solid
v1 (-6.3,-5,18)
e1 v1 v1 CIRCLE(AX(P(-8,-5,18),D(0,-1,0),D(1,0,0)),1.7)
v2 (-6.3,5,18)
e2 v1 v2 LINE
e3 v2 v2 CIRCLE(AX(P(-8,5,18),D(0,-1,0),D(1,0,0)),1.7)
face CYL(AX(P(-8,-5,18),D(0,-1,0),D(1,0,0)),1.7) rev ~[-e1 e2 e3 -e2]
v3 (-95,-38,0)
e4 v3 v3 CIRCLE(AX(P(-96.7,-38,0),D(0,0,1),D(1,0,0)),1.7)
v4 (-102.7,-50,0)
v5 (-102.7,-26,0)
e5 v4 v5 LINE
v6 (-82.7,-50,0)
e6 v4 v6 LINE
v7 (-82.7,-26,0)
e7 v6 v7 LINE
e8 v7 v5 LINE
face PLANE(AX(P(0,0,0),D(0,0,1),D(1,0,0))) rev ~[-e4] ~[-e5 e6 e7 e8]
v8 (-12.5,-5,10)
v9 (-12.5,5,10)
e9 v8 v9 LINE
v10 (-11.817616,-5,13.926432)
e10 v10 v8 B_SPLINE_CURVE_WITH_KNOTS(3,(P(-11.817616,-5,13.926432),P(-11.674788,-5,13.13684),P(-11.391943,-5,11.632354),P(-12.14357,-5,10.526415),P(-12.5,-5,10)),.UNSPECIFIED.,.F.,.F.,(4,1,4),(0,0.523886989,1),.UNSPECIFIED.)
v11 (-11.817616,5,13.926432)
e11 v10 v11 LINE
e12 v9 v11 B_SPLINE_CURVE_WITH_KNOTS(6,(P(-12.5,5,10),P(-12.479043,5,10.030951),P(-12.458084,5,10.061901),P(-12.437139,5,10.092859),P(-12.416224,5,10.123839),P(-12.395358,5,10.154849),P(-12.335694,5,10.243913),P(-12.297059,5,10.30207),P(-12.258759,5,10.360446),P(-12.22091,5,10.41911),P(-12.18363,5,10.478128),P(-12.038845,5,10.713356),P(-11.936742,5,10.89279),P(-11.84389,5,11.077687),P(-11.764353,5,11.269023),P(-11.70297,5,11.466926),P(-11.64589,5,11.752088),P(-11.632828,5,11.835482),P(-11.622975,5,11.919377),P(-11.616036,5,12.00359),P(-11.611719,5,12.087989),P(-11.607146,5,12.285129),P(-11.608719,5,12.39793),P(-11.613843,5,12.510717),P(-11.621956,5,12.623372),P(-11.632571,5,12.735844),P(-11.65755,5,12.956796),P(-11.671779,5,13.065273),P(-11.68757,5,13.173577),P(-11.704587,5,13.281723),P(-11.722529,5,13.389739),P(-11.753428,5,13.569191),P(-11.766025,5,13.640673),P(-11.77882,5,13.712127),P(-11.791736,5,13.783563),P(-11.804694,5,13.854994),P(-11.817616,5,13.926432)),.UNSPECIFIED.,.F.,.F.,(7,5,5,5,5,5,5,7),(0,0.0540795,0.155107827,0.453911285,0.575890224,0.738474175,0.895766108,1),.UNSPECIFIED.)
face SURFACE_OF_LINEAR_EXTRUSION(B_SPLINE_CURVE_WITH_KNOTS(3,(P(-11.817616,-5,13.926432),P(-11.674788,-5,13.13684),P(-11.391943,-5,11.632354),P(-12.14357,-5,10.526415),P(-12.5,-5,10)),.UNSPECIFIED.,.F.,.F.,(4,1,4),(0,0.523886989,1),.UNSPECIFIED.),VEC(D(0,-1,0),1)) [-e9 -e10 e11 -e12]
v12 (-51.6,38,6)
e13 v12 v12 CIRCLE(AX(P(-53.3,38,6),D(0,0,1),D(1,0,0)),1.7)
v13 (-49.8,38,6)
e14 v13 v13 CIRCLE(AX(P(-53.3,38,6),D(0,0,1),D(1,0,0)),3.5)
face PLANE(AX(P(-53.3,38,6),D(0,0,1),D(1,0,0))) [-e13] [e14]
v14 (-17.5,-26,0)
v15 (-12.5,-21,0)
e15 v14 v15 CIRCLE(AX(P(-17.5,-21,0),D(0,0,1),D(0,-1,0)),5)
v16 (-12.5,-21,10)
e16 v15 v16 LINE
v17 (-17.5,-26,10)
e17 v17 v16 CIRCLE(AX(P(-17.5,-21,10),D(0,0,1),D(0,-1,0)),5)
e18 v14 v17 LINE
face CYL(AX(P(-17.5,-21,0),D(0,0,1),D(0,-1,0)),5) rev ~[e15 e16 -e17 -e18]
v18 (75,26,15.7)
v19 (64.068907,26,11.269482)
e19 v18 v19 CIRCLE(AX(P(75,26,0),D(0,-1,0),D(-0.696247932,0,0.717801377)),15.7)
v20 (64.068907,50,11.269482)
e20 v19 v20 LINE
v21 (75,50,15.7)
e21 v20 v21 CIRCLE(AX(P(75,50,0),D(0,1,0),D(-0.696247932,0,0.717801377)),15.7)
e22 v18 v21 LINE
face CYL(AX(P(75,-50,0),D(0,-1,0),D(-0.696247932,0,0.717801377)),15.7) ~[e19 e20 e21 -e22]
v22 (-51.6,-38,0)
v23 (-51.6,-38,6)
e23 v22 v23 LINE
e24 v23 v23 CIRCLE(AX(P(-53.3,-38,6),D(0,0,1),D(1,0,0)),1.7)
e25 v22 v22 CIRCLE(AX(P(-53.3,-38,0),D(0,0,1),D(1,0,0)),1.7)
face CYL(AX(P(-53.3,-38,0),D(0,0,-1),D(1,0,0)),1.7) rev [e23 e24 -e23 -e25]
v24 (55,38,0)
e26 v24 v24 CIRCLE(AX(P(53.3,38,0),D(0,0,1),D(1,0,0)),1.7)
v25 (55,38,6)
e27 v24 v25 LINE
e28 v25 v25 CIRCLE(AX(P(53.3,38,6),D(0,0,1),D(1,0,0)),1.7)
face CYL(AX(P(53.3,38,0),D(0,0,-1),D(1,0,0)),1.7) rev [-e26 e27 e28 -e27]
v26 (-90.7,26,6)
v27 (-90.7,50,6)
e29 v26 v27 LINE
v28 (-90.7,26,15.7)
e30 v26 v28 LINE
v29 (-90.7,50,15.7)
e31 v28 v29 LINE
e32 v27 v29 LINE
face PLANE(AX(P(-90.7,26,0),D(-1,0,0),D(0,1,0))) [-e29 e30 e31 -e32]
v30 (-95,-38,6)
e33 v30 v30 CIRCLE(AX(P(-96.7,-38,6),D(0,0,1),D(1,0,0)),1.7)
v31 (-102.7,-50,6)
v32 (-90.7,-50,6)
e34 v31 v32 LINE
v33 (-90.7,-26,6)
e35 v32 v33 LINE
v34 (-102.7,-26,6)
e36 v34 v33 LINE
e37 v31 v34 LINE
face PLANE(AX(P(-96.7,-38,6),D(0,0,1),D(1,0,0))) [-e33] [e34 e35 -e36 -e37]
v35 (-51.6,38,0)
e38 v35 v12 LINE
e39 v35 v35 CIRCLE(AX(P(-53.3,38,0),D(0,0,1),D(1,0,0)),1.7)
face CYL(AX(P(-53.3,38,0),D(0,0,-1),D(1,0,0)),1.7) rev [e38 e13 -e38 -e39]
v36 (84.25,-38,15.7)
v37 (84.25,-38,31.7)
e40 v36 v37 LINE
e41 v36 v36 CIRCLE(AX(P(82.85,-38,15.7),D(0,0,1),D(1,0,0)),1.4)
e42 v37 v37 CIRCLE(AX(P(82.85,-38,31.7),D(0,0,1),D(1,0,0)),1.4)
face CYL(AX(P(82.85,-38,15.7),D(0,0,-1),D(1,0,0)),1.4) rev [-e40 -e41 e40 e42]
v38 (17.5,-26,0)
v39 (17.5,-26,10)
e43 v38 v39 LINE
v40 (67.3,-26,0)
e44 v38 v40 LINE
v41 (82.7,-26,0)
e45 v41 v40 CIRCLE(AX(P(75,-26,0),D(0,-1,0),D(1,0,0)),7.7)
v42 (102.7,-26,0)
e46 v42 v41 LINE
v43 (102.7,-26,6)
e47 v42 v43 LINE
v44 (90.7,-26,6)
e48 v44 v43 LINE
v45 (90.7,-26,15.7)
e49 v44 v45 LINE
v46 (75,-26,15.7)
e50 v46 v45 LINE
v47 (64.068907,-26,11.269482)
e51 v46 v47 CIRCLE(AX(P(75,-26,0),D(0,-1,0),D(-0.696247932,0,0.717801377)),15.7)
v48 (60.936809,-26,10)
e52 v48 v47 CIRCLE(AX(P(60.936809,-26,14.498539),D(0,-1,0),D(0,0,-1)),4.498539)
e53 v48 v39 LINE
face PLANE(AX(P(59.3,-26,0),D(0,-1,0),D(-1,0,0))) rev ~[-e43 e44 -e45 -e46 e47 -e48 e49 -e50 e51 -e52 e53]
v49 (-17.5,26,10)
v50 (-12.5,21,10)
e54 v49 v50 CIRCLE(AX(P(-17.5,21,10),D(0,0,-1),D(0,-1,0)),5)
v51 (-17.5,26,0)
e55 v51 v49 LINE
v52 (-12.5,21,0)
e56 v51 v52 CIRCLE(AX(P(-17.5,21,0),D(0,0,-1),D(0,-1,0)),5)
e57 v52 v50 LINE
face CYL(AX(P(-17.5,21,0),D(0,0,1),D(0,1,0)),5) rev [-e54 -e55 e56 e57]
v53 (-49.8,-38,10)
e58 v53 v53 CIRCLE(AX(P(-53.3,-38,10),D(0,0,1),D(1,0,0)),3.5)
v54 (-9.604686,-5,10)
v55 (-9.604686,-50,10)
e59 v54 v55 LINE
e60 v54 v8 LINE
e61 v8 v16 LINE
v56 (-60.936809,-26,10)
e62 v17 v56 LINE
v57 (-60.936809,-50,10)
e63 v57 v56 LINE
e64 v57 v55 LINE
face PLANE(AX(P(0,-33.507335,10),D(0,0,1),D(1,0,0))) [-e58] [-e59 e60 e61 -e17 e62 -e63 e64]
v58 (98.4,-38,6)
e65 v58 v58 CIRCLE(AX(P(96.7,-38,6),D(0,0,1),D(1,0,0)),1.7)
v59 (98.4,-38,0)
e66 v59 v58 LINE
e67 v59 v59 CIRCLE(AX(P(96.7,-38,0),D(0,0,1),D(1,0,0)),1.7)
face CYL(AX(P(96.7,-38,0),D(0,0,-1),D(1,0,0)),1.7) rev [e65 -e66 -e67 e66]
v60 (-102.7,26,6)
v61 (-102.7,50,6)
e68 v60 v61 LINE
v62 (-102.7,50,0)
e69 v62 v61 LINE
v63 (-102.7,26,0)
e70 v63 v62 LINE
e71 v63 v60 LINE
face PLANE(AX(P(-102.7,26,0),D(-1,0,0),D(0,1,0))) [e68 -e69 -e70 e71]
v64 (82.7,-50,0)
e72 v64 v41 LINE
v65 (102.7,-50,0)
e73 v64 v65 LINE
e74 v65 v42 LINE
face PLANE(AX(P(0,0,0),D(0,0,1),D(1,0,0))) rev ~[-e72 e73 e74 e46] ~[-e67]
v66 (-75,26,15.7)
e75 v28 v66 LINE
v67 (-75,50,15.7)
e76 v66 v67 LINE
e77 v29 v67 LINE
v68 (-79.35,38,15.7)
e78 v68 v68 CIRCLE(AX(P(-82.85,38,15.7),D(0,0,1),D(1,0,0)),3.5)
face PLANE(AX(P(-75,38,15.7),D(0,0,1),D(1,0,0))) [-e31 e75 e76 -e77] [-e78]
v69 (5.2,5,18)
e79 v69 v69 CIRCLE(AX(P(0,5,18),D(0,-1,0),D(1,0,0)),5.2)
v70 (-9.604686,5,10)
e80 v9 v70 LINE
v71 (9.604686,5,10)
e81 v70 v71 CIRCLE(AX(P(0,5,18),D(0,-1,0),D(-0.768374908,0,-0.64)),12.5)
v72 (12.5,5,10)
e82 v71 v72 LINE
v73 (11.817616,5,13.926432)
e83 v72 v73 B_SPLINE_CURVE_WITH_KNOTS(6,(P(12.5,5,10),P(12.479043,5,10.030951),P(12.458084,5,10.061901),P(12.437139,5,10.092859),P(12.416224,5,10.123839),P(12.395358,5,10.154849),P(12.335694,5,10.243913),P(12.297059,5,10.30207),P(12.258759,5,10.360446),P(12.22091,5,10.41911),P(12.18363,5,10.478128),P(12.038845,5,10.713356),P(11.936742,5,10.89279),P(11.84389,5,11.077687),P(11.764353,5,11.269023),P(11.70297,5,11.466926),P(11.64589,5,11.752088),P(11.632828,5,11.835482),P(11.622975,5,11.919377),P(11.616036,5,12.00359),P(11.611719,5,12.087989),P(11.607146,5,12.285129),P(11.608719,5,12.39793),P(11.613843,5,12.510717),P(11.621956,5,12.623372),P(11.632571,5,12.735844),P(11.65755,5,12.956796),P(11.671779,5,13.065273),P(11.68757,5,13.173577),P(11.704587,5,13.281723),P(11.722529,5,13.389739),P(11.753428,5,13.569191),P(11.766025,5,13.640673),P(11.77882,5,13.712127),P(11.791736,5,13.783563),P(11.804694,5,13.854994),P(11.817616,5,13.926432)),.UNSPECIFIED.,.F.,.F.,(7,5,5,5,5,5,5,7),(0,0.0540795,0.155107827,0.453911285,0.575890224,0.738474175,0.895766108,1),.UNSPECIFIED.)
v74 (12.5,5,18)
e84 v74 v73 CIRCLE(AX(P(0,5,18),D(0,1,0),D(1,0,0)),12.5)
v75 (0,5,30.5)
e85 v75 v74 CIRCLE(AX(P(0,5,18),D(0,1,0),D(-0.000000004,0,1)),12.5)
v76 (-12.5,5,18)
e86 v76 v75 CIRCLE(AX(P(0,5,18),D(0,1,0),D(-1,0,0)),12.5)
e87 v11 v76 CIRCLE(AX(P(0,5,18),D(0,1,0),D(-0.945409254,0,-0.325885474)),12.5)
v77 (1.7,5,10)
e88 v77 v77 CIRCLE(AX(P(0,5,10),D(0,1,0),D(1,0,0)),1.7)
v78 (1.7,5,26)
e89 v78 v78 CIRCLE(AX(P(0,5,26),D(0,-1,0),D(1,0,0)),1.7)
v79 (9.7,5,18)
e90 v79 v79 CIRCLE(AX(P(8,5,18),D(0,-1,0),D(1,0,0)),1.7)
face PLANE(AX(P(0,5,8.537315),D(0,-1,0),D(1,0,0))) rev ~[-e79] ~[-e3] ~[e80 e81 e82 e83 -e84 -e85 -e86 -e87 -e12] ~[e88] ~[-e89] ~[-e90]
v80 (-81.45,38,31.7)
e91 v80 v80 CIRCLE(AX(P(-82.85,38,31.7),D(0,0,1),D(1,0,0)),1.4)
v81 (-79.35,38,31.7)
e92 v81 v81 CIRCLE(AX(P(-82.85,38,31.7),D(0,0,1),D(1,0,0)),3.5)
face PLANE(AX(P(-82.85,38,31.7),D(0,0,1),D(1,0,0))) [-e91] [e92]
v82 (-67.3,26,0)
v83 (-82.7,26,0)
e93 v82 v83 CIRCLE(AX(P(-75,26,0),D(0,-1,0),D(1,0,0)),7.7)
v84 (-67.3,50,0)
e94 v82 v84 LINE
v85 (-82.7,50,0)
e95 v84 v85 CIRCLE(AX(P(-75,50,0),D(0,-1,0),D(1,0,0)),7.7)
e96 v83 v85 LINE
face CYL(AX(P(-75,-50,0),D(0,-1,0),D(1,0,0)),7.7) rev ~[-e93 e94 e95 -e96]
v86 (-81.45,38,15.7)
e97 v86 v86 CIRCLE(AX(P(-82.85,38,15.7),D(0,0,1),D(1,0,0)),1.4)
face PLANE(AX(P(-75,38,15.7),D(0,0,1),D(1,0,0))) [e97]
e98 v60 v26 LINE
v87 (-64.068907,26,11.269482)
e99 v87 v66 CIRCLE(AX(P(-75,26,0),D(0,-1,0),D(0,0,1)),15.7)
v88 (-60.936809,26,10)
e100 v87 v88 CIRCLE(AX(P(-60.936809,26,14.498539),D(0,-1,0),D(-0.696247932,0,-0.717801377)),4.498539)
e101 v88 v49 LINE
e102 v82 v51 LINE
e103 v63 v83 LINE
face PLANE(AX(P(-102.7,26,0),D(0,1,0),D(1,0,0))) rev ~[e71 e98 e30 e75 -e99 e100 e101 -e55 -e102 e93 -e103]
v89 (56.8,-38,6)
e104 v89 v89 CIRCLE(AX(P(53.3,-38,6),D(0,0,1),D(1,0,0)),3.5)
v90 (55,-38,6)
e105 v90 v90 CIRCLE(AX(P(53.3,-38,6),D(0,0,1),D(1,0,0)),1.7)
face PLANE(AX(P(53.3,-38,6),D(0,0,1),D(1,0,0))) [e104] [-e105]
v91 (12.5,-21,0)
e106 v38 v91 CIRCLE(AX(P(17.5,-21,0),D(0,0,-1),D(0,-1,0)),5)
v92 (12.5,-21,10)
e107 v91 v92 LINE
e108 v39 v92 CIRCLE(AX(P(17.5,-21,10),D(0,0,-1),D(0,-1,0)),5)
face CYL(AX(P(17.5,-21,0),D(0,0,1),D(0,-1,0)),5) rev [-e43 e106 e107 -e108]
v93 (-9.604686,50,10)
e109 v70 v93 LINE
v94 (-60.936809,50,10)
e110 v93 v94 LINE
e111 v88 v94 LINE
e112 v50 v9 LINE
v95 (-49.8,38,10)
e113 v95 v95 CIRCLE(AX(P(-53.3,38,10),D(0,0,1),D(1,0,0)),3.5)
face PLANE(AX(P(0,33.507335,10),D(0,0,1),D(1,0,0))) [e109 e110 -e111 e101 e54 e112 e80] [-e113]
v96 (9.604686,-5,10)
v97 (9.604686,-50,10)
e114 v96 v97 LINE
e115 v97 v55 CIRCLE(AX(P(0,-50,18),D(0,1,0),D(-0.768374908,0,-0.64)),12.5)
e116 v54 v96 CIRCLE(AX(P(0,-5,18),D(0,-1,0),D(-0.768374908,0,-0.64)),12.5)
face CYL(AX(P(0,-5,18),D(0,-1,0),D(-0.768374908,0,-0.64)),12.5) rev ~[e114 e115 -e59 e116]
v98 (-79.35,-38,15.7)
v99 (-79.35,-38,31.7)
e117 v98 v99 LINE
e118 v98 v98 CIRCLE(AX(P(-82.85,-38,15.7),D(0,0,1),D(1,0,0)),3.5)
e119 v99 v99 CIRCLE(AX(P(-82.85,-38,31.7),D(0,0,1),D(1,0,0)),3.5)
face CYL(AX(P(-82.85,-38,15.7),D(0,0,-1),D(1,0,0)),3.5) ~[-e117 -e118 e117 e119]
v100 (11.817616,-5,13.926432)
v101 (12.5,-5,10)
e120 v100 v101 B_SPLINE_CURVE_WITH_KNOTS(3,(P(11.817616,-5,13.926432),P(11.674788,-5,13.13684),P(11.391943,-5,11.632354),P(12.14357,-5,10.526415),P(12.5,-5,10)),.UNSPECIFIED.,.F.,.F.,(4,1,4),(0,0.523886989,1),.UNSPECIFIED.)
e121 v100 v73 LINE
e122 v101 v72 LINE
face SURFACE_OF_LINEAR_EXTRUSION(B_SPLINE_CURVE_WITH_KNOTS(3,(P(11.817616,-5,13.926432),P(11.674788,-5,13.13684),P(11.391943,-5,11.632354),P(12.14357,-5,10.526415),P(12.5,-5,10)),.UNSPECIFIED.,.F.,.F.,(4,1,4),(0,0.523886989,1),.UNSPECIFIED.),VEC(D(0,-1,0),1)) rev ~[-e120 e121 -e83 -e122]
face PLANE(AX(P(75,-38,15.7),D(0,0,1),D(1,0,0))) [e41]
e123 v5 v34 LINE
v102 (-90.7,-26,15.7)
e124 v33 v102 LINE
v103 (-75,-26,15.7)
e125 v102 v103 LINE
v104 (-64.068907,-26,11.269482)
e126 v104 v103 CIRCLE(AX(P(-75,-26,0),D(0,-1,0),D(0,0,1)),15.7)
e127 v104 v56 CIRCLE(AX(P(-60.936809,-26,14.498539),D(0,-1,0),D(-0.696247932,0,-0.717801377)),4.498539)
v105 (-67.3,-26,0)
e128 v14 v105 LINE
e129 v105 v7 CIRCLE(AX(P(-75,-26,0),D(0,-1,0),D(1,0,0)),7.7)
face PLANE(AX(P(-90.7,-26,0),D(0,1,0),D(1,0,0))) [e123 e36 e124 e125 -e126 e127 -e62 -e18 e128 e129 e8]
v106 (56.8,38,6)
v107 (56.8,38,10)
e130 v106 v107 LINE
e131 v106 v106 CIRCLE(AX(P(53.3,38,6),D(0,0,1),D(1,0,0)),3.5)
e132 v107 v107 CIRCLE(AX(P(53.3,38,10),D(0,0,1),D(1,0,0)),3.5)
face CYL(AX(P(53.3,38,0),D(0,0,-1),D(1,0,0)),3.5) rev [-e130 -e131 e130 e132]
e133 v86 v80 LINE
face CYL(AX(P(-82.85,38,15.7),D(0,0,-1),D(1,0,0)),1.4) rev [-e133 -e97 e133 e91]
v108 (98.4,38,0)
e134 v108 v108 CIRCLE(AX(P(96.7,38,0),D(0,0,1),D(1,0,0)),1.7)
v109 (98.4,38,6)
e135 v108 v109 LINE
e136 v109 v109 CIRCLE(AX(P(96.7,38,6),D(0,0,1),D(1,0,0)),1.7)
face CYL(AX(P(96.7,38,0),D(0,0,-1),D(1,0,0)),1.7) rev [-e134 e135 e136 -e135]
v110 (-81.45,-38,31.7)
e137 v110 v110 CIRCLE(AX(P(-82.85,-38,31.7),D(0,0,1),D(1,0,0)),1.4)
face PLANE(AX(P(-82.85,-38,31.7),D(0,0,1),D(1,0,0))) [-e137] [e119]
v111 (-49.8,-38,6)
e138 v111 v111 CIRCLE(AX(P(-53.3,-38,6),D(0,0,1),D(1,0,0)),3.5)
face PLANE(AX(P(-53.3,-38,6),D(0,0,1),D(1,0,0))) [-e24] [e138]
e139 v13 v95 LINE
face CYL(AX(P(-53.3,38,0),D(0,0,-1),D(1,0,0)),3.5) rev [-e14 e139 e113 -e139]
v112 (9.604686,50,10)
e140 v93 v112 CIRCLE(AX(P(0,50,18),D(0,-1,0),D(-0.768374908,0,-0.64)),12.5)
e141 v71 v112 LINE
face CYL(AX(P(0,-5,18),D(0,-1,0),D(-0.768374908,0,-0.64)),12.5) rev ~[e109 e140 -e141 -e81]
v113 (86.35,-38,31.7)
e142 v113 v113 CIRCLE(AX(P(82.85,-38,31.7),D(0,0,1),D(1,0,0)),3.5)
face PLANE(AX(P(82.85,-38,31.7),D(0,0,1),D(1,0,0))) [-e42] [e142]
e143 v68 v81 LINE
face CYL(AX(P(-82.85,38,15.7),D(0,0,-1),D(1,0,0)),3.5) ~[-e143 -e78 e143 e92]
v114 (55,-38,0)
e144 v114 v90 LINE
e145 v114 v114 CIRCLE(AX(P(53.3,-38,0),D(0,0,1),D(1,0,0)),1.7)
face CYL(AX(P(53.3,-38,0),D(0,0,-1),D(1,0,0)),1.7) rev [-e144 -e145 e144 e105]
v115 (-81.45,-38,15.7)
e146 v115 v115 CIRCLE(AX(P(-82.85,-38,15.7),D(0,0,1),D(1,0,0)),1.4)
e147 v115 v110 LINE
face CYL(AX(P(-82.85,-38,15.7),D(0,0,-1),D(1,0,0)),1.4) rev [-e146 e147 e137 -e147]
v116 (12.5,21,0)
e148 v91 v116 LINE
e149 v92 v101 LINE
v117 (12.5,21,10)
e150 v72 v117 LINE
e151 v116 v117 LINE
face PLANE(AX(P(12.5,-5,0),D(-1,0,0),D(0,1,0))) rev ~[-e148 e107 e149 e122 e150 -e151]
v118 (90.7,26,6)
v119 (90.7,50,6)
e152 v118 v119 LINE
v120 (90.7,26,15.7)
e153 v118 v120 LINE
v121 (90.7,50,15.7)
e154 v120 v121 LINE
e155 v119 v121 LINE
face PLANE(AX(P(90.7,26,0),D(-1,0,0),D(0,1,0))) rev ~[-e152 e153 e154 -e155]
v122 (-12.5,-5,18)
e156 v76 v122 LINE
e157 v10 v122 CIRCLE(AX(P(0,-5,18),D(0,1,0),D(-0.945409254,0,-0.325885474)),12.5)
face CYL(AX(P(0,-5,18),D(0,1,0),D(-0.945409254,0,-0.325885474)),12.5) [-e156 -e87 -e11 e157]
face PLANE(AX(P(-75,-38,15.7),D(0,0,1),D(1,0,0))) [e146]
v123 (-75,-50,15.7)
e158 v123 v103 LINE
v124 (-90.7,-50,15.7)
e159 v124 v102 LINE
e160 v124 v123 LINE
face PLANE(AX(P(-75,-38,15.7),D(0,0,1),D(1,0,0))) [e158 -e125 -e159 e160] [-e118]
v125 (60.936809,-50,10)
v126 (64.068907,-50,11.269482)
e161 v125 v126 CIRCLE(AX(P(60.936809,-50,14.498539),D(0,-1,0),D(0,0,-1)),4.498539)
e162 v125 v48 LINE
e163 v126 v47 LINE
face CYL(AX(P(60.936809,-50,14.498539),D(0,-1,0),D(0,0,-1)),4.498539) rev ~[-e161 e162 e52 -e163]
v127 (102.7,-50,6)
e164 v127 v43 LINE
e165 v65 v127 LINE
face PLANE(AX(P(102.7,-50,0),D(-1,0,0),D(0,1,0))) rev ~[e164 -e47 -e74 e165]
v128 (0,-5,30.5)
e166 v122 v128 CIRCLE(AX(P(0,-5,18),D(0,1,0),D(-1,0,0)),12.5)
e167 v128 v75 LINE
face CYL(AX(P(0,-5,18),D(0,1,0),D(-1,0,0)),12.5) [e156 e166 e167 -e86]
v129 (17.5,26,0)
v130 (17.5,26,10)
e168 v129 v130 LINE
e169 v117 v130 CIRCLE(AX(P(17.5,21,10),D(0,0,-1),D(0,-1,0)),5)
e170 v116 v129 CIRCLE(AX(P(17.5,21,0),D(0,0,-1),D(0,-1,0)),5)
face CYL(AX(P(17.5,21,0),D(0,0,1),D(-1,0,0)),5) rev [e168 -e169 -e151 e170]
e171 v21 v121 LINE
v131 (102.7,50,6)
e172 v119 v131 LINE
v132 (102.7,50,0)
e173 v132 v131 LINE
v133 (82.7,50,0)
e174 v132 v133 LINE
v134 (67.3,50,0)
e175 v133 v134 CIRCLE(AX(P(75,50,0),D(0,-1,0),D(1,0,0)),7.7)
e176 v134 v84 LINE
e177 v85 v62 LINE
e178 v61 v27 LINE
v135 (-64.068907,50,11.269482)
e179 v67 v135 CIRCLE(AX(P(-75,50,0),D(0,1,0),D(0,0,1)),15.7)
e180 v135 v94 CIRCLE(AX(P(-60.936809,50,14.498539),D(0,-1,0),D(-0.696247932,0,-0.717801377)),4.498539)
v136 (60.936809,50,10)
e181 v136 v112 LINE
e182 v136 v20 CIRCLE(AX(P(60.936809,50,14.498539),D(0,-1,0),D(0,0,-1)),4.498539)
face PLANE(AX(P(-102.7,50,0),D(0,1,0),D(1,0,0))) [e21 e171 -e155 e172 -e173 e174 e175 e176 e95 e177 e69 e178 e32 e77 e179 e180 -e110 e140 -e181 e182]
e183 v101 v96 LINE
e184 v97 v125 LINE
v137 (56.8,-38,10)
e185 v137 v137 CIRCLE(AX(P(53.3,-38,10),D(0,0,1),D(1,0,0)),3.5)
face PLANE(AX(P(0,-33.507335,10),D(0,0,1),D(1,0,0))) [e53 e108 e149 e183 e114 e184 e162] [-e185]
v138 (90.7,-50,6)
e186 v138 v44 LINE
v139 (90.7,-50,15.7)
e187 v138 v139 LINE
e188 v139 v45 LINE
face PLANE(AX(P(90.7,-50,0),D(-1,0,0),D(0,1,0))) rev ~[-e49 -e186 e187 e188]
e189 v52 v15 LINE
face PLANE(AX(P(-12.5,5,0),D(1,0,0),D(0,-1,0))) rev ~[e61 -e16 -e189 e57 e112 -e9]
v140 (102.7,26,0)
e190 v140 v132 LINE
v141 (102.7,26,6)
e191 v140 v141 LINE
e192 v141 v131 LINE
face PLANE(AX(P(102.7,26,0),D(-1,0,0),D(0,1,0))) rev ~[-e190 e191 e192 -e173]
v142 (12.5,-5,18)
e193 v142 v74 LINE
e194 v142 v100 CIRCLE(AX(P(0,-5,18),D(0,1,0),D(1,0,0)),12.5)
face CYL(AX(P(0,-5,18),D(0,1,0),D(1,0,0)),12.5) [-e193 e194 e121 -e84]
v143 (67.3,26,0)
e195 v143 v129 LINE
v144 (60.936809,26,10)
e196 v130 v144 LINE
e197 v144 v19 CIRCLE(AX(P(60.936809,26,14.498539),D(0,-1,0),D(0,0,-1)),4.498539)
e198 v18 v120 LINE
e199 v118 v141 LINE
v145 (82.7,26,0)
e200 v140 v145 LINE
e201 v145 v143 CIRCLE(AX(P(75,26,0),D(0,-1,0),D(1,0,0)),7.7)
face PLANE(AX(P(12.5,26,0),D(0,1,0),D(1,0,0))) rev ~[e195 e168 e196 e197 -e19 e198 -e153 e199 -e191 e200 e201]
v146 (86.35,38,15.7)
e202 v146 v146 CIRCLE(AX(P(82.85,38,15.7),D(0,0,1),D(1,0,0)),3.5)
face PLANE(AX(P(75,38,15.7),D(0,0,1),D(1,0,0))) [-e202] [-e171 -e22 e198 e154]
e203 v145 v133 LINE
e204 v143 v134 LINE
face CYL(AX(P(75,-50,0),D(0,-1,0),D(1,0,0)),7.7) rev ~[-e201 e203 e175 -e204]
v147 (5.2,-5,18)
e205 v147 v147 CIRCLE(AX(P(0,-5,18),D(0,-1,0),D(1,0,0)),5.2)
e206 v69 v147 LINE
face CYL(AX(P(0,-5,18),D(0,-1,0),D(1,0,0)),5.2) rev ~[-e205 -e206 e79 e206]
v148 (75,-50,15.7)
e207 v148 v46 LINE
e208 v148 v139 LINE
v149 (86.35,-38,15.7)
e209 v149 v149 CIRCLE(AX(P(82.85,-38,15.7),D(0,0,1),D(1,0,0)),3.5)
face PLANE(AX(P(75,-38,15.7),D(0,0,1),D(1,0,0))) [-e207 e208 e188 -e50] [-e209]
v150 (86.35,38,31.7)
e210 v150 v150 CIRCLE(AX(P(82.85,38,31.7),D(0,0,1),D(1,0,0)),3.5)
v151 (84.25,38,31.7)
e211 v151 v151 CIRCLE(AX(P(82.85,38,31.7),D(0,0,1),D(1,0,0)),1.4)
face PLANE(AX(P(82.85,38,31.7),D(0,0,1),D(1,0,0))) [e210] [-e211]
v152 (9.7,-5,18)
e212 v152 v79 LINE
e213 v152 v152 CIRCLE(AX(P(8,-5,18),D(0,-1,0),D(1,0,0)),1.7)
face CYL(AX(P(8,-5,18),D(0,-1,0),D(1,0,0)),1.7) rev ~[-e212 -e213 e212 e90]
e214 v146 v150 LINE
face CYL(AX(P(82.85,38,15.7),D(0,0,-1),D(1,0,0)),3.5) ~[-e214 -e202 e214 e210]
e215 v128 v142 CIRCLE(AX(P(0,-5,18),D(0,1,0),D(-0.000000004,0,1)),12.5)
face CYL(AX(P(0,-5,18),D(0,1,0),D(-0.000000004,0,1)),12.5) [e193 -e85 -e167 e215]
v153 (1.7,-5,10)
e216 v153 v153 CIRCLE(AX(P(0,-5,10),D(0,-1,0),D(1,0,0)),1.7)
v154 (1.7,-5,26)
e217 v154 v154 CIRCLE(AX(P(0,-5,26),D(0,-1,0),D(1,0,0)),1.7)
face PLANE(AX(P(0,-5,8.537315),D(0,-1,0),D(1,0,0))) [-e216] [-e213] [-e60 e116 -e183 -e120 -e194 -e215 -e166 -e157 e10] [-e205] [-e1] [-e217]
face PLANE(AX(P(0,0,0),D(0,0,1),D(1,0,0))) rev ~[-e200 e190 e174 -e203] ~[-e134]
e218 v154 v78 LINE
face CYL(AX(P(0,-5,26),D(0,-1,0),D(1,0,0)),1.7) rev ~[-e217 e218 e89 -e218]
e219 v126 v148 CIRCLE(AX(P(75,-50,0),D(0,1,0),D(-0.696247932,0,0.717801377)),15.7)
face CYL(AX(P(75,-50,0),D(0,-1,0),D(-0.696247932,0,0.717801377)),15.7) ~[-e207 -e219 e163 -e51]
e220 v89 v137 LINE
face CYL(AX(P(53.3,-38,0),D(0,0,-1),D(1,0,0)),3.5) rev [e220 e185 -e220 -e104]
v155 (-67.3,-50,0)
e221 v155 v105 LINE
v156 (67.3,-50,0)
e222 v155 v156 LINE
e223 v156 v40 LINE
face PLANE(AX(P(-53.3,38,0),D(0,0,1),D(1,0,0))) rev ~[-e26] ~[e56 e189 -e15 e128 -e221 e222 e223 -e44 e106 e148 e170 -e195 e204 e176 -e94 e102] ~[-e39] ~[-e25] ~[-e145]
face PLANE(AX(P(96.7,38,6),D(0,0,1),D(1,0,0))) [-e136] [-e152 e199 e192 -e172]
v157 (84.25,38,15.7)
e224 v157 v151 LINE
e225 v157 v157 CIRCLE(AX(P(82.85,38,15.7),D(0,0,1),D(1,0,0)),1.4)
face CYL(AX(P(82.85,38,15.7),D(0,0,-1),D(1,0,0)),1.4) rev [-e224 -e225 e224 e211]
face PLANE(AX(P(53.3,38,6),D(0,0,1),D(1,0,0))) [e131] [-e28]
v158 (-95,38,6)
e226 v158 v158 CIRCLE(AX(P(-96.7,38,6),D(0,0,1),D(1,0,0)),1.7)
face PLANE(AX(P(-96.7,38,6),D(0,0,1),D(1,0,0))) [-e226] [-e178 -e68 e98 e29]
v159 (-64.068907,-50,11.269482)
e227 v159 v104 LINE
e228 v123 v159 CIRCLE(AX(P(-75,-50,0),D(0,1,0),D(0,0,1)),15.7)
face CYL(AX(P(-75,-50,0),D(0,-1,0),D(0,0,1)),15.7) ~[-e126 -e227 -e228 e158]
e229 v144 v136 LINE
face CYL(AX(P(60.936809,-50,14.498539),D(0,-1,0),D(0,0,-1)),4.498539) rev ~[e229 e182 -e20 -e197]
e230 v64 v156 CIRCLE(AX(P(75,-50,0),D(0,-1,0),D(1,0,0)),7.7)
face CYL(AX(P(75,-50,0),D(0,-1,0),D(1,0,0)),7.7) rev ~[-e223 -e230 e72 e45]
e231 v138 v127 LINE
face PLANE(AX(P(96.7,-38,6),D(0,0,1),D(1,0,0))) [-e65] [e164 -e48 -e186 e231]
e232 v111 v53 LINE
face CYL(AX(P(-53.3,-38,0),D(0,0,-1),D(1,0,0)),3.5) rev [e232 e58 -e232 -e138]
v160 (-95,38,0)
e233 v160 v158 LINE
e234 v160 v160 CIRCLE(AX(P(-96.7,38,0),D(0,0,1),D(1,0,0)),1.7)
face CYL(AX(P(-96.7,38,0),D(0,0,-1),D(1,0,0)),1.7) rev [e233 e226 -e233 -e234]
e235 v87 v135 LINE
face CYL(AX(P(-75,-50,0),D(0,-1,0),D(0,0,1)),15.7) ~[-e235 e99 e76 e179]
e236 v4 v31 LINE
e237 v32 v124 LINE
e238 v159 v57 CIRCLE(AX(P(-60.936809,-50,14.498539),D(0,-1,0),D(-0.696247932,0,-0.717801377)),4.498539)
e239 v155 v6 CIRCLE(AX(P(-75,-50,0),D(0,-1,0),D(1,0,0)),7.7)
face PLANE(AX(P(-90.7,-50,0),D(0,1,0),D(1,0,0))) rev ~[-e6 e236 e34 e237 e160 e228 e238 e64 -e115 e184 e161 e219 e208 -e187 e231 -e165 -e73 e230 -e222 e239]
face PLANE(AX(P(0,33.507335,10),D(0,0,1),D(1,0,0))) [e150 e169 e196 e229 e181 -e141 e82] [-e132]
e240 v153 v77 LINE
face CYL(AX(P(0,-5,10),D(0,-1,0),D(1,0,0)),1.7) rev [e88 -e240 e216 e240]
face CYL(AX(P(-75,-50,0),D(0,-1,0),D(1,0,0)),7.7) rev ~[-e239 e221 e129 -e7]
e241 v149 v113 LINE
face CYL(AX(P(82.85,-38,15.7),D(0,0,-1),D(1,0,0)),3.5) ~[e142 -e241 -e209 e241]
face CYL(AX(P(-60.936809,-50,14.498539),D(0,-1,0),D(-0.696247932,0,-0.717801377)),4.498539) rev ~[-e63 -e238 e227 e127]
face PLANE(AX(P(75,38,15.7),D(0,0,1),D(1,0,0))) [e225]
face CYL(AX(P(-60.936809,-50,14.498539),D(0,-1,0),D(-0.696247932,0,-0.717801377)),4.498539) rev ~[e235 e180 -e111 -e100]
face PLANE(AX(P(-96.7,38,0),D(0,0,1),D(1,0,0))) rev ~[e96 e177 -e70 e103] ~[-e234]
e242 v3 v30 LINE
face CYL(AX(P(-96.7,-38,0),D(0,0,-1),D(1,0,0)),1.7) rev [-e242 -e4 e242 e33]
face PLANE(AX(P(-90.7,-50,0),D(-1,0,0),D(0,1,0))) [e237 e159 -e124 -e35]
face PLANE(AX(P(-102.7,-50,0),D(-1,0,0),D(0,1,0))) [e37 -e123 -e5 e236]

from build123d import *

# Parameters (mm, degrees)
F0_R      = 3.5
F1_DEPTH  = 10
F0_W      = 31.4
F0_H      = 24
F2_DEPTH  = 15.7
F3_DEPTH  = 30.5
F6_DEPTH  = 100
F7_R      = 1.7
F7_R_2    = 5.2
F8_DEPTH  = 60
F9_DEPTH  = 100
F10_DEPTH = 100
F11_DEPTH = 10
F12_R     = 5
F0_W_2    = 12
F0_R_2    = 1.7
F13_DEPTH = 6
F14_DEPTH = 6
F15_R     = 3.5
F15_R_2   = 1.4
F16_DEPTH = 16


# Not quite as in the source:
# - a feature names something its author has since deleted; it is built from what else it names


with BuildPart() as f1:
    # F0 (on Top) → F1 (new body)
    with BuildSketch(Plane.XY):
        Polygon((59.3, 50), (0, 50), (-59.3, 50), (-59.3, 26), (-12.5, 26), (-12.5, 5), (12.5, 5), (12.5, 26), (59.3, 26), align=None)
        with Locations((-53.3, 38)):
            Circle(F0_R, mode=Mode.SUBTRACT)
        with Locations((53.3, 38)):
            Circle(F0_R, mode=Mode.SUBTRACT)
    extrude(amount=F1_DEPTH)

    # F0 (on Top) → F2 (join)
    with BuildSketch(Plane.XY):
        with Locations((-75, 38)):
            Rectangle(F0_W, F0_H)
        with Locations((75, 38)):
            Rectangle(F0_W, F0_H)
    extrude(amount=F2_DEPTH)



with BuildPart() as f1b:
    # F0 (on Top) → F1, piece 2 (new body)
    with BuildSketch(Plane.XY):
        Polygon((12.5, -5), (-12.5, -5), (-12.5, -26), (-59.3, -26), (-59.3, -50), (0, -50), (59.3, -50), (59.3, -26), (12.5, -26), align=None)
        with Locations((-53.3, -38)):
            Circle(F0_R, mode=Mode.SUBTRACT)
        with Locations((53.3, -38)):
            Circle(F0_R, mode=Mode.SUBTRACT)
    extrude(amount=F1_DEPTH)

    # F0 (on Top) → F2, piece 2 (join)
    with BuildSketch(Plane.XY):
        with Locations((-75, -38)):
            Rectangle(F0_W, F0_H)
        with Locations((75, -38)):
            Rectangle(F0_W, F0_H)
    extrude(amount=F2_DEPTH)


with BuildPart() as f1_1:
    add(f1.part)

    add(f1b.part)  # F3 merges F1b
    # F0 (on Top) → F3 (join)
    with BuildSketch(Plane.XY):
        Polygon((12.5, 5), (-12.5, 5), (-12.5, 0), (-12.5, -5), (12.5, -5), (12.5, 0), align=None)
    extrude(amount=F3_DEPTH)

    # F4: union 

    # F5 (on face) → F6 (cut)
    with BuildSketch(Plane.XZ.offset(50)):
        with BuildLine():
            Line((59.3, 15.7), (59.3, 10))
            Line((59.3, 10), (60.936808709, 10))
            ThreePointArc((60.936808709, 10), (62.6266035374, 10.3294327596), (64.0689074703, 11.2694816254))
            ThreePointArc((64.0689074703, 11.2694816254), (69.1025794418, 14.5502725321), (75, 15.7))
            Line((75, 15.7), (59.3, 15.7))
        make_face()
        with BuildLine():
            ThreePointArc((82.7, 0), (75, 7.7), (67.3, 0))
            Line((67.3, 0), (82.7, 0))
        make_face()
        with BuildLine():
            ThreePointArc((-75, 15.7), (-69.1025794418, 14.5502725321), (-64.0689074703, 11.2694816254))
            ThreePointArc((-64.0689074703, 11.2694816254), (-62.6266035374, 10.3294327596), (-60.936808709, 10))
            Line((-60.936808709, 10), (-59.3, 10))
            Line((-59.3, 10), (-59.3, 15.7))
            Line((-59.3, 15.7), (-75, 15.7))
        make_face()
        with BuildLine():
            ThreePointArc((-67.3, 0), (-75, 7.7), (-82.7, 0))
            Line((-82.7, 0), (-67.3, 0))
        make_face()
    extrude(amount=-F6_DEPTH, mode=Mode.SUBTRACT)

    # F7 (on face) → F8 (cut, symmetric)
    with BuildSketch(Plane.XZ.offset(5)):
        with BuildLine():
            Line((-12.5, 30.5), (-12.5, 18))
            ThreePointArc((-12.5, 18), (-8.8388347819, 26.8388347478), (-4.83e-08, 30.5))
            Line((-4.83e-08, 30.5), (-12.5, 30.5))
        make_face()
        with BuildLine():
            Line((12.5, 30.5), (-4.83e-08, 30.5))
            ThreePointArc((-4.83e-08, 30.5), (8.8388347478, 26.8388347819), (12.5, 18))
            Line((12.5, 18), (12.5, 30.5))
        make_face()
        with BuildLine():
            add(Edge.make_bspline(
                [(-11.8176156762, 13.9264315731), (-11.6747882381, 13.1368398711), (-11.3919431578, 11.6323543495), (-12.1435697242, 10.5264146596), (-12.5, 10)],
                knots=[0, 0, 0, 0, 0.5238869887, 1, 1, 1, 1], degree=3))
            ThreePointArc((-11.8176156762, 13.9264315731), (-12.3282236343, 15.9348360783), (-12.5, 18))
            Line((-12.5, 18), (-12.5, 10))
        make_face()
        with BuildLine():
            Line((12.5, 10), (12.5, 18))
            ThreePointArc((12.5, 18), (12.3282236343, 15.9348360783), (11.8176156762, 13.9264315731))
            add(Edge.make_bspline(
                [(11.8176156762, 13.9264315731), (11.6747882381, 13.1368398711), (11.3919431578, 11.6323543495), (12.1435697242, 10.5264146596), (12.5, 10)],
                knots=[0, 0, 0, 0, 0.5238869887, 1, 1, 1, 1], degree=3))
        make_face()
        with Locations((-8, 18)):
            Circle(F7_R)
        with Locations((0, 26)):
            Circle(F7_R)
        with Locations((8, 18)):
            Circle(F7_R)
        with BuildLine():
            ThreePointArc((1.7, 10), (0, 11.7), (-1.7, 10))
            Line((-1.7, 10), (1.7, 10))
        make_face()
        with BuildLine():
            Line((1.7, 10), (-1.7, 10))
            ThreePointArc((-1.7, 10), (0, 8.3), (1.7, 10))
        make_face()
        with Locations((0, 18)):
            Circle(F7_R_2)
    extrude(amount=F8_DEPTH, both=True, mode=Mode.SUBTRACT)

    # F7 (on face) → F9 (cut)
    with BuildSketch(Plane.XZ.offset(5)):
        with BuildLine():
            Line((-1.7, 10), (-9.6046863561, 10))
            ThreePointArc((-9.6046863561, 10), (0, 5.5), (9.6046863561, 10))
            Line((9.6046863561, 10), (1.7, 10))
            ThreePointArc((1.7, 10), (0, 8.3), (-1.7, 10))
        make_face()
    extrude(amount=F9_DEPTH, mode=Mode.SUBTRACT)

    # F7 (on face) → F10 (cut)
    with BuildSketch(Plane.XZ.offset(5)):
        with BuildLine():
            Line((-1.7, 10), (-9.6046863561, 10))
            ThreePointArc((-9.6046863561, 10), (0, 5.5), (9.6046863561, 10))
            Line((9.6046863561, 10), (1.7, 10))
            ThreePointArc((1.7, 10), (0, 8.3), (-1.7, 10))
        make_face()
    extrude(amount=-F10_DEPTH, mode=Mode.SUBTRACT)

    # F7 (on face) → F11 (join)
    with BuildSketch(Plane.XZ.offset(5)):
        with BuildLine():
            Line((-1.7, 10), (-9.6046863561, 10))
            ThreePointArc((-9.6046863561, 10), (0, 5.5), (9.6046863561, 10))
            Line((9.6046863561, 10), (1.7, 10))
            ThreePointArc((1.7, 10), (0, 8.3), (-1.7, 10))
        make_face()
    extrude(amount=-F11_DEPTH)

    # F12
    f12_edges = [f1_1.edges().sort_by_distance(p)[0] for p in [
        (-12.5, 26, 5),
        (12.5, 26, 5),
        (-12.5, -26, 5),
        (12.5, -26, 5),
    ]]
    fillet(f12_edges, radius=F12_R)

    # F0 (on Top) → F13 (join)
    with BuildSketch(Plane.XY):
        with Locations((-96.7, 38)):
            Rectangle(F0_W_2, F0_H)
        with Locations((-96.7, 38)):
            Circle(F0_R_2, mode=Mode.SUBTRACT)
        with Locations((-96.7, -38)):
            Rectangle(F0_W_2, F0_H)
        with Locations((-96.7, -38)):
            Circle(F0_R_2, mode=Mode.SUBTRACT)
        with Locations((96.7, -38)):
            Rectangle(F0_W_2, F0_H)
        with Locations((96.7, -38)):
            Circle(F0_R_2, mode=Mode.SUBTRACT)
        with Locations((96.7, 38)):
            Rectangle(F0_W_2, F0_H)
        with Locations((96.7, 38)):
            Circle(F0_R_2, mode=Mode.SUBTRACT)
    extrude(amount=F13_DEPTH)

    # F0 (on Top) → F14 (join)
    with BuildSketch(Plane.XY):
        with Locations((-53.3, 38)):
            Circle(F0_R)
        with Locations((-53.3, 38)):
            Circle(F0_R_2, mode=Mode.SUBTRACT)
        with Locations((53.3, 38)):
            Circle(F0_R)
        with Locations((53.3, 38)):
            Circle(F0_R_2, mode=Mode.SUBTRACT)
        with Locations((-53.3, -38)):
            Circle(F0_R)
        with Locations((-53.3, -38)):
            Circle(F0_R_2, mode=Mode.SUBTRACT)
        with Locations((53.3, -38)):
            Circle(F0_R)
        with Locations((53.3, -38)):
            Circle(F0_R_2, mode=Mode.SUBTRACT)
    extrude(amount=F14_DEPTH)

    # F15 (on face) → F16 (join)
    with BuildSketch(Plane.XY.offset(15.7)):
        with Locations((-82.85, 38)):
            Circle(F15_R)
        with Locations((-82.85, 38)):
            Circle(F15_R_2, mode=Mode.SUBTRACT)
        with Locations((82.85, 38)):
            Circle(F15_R)
        with Locations((82.85, 38)):
            Circle(F15_R_2, mode=Mode.SUBTRACT)
        with Locations((82.85, -38)):
            Circle(F15_R)
        with Locations((82.85, -38)):
            Circle(F15_R_2, mode=Mode.SUBTRACT)
        with Locations((-82.85, -38)):
            Circle(F15_R)
        with Locations((-82.85, -38)):
            Circle(F15_R_2, mode=Mode.SUBTRACT)
    extrude(amount=F16_DEPTH)


solid = f1_1.part
